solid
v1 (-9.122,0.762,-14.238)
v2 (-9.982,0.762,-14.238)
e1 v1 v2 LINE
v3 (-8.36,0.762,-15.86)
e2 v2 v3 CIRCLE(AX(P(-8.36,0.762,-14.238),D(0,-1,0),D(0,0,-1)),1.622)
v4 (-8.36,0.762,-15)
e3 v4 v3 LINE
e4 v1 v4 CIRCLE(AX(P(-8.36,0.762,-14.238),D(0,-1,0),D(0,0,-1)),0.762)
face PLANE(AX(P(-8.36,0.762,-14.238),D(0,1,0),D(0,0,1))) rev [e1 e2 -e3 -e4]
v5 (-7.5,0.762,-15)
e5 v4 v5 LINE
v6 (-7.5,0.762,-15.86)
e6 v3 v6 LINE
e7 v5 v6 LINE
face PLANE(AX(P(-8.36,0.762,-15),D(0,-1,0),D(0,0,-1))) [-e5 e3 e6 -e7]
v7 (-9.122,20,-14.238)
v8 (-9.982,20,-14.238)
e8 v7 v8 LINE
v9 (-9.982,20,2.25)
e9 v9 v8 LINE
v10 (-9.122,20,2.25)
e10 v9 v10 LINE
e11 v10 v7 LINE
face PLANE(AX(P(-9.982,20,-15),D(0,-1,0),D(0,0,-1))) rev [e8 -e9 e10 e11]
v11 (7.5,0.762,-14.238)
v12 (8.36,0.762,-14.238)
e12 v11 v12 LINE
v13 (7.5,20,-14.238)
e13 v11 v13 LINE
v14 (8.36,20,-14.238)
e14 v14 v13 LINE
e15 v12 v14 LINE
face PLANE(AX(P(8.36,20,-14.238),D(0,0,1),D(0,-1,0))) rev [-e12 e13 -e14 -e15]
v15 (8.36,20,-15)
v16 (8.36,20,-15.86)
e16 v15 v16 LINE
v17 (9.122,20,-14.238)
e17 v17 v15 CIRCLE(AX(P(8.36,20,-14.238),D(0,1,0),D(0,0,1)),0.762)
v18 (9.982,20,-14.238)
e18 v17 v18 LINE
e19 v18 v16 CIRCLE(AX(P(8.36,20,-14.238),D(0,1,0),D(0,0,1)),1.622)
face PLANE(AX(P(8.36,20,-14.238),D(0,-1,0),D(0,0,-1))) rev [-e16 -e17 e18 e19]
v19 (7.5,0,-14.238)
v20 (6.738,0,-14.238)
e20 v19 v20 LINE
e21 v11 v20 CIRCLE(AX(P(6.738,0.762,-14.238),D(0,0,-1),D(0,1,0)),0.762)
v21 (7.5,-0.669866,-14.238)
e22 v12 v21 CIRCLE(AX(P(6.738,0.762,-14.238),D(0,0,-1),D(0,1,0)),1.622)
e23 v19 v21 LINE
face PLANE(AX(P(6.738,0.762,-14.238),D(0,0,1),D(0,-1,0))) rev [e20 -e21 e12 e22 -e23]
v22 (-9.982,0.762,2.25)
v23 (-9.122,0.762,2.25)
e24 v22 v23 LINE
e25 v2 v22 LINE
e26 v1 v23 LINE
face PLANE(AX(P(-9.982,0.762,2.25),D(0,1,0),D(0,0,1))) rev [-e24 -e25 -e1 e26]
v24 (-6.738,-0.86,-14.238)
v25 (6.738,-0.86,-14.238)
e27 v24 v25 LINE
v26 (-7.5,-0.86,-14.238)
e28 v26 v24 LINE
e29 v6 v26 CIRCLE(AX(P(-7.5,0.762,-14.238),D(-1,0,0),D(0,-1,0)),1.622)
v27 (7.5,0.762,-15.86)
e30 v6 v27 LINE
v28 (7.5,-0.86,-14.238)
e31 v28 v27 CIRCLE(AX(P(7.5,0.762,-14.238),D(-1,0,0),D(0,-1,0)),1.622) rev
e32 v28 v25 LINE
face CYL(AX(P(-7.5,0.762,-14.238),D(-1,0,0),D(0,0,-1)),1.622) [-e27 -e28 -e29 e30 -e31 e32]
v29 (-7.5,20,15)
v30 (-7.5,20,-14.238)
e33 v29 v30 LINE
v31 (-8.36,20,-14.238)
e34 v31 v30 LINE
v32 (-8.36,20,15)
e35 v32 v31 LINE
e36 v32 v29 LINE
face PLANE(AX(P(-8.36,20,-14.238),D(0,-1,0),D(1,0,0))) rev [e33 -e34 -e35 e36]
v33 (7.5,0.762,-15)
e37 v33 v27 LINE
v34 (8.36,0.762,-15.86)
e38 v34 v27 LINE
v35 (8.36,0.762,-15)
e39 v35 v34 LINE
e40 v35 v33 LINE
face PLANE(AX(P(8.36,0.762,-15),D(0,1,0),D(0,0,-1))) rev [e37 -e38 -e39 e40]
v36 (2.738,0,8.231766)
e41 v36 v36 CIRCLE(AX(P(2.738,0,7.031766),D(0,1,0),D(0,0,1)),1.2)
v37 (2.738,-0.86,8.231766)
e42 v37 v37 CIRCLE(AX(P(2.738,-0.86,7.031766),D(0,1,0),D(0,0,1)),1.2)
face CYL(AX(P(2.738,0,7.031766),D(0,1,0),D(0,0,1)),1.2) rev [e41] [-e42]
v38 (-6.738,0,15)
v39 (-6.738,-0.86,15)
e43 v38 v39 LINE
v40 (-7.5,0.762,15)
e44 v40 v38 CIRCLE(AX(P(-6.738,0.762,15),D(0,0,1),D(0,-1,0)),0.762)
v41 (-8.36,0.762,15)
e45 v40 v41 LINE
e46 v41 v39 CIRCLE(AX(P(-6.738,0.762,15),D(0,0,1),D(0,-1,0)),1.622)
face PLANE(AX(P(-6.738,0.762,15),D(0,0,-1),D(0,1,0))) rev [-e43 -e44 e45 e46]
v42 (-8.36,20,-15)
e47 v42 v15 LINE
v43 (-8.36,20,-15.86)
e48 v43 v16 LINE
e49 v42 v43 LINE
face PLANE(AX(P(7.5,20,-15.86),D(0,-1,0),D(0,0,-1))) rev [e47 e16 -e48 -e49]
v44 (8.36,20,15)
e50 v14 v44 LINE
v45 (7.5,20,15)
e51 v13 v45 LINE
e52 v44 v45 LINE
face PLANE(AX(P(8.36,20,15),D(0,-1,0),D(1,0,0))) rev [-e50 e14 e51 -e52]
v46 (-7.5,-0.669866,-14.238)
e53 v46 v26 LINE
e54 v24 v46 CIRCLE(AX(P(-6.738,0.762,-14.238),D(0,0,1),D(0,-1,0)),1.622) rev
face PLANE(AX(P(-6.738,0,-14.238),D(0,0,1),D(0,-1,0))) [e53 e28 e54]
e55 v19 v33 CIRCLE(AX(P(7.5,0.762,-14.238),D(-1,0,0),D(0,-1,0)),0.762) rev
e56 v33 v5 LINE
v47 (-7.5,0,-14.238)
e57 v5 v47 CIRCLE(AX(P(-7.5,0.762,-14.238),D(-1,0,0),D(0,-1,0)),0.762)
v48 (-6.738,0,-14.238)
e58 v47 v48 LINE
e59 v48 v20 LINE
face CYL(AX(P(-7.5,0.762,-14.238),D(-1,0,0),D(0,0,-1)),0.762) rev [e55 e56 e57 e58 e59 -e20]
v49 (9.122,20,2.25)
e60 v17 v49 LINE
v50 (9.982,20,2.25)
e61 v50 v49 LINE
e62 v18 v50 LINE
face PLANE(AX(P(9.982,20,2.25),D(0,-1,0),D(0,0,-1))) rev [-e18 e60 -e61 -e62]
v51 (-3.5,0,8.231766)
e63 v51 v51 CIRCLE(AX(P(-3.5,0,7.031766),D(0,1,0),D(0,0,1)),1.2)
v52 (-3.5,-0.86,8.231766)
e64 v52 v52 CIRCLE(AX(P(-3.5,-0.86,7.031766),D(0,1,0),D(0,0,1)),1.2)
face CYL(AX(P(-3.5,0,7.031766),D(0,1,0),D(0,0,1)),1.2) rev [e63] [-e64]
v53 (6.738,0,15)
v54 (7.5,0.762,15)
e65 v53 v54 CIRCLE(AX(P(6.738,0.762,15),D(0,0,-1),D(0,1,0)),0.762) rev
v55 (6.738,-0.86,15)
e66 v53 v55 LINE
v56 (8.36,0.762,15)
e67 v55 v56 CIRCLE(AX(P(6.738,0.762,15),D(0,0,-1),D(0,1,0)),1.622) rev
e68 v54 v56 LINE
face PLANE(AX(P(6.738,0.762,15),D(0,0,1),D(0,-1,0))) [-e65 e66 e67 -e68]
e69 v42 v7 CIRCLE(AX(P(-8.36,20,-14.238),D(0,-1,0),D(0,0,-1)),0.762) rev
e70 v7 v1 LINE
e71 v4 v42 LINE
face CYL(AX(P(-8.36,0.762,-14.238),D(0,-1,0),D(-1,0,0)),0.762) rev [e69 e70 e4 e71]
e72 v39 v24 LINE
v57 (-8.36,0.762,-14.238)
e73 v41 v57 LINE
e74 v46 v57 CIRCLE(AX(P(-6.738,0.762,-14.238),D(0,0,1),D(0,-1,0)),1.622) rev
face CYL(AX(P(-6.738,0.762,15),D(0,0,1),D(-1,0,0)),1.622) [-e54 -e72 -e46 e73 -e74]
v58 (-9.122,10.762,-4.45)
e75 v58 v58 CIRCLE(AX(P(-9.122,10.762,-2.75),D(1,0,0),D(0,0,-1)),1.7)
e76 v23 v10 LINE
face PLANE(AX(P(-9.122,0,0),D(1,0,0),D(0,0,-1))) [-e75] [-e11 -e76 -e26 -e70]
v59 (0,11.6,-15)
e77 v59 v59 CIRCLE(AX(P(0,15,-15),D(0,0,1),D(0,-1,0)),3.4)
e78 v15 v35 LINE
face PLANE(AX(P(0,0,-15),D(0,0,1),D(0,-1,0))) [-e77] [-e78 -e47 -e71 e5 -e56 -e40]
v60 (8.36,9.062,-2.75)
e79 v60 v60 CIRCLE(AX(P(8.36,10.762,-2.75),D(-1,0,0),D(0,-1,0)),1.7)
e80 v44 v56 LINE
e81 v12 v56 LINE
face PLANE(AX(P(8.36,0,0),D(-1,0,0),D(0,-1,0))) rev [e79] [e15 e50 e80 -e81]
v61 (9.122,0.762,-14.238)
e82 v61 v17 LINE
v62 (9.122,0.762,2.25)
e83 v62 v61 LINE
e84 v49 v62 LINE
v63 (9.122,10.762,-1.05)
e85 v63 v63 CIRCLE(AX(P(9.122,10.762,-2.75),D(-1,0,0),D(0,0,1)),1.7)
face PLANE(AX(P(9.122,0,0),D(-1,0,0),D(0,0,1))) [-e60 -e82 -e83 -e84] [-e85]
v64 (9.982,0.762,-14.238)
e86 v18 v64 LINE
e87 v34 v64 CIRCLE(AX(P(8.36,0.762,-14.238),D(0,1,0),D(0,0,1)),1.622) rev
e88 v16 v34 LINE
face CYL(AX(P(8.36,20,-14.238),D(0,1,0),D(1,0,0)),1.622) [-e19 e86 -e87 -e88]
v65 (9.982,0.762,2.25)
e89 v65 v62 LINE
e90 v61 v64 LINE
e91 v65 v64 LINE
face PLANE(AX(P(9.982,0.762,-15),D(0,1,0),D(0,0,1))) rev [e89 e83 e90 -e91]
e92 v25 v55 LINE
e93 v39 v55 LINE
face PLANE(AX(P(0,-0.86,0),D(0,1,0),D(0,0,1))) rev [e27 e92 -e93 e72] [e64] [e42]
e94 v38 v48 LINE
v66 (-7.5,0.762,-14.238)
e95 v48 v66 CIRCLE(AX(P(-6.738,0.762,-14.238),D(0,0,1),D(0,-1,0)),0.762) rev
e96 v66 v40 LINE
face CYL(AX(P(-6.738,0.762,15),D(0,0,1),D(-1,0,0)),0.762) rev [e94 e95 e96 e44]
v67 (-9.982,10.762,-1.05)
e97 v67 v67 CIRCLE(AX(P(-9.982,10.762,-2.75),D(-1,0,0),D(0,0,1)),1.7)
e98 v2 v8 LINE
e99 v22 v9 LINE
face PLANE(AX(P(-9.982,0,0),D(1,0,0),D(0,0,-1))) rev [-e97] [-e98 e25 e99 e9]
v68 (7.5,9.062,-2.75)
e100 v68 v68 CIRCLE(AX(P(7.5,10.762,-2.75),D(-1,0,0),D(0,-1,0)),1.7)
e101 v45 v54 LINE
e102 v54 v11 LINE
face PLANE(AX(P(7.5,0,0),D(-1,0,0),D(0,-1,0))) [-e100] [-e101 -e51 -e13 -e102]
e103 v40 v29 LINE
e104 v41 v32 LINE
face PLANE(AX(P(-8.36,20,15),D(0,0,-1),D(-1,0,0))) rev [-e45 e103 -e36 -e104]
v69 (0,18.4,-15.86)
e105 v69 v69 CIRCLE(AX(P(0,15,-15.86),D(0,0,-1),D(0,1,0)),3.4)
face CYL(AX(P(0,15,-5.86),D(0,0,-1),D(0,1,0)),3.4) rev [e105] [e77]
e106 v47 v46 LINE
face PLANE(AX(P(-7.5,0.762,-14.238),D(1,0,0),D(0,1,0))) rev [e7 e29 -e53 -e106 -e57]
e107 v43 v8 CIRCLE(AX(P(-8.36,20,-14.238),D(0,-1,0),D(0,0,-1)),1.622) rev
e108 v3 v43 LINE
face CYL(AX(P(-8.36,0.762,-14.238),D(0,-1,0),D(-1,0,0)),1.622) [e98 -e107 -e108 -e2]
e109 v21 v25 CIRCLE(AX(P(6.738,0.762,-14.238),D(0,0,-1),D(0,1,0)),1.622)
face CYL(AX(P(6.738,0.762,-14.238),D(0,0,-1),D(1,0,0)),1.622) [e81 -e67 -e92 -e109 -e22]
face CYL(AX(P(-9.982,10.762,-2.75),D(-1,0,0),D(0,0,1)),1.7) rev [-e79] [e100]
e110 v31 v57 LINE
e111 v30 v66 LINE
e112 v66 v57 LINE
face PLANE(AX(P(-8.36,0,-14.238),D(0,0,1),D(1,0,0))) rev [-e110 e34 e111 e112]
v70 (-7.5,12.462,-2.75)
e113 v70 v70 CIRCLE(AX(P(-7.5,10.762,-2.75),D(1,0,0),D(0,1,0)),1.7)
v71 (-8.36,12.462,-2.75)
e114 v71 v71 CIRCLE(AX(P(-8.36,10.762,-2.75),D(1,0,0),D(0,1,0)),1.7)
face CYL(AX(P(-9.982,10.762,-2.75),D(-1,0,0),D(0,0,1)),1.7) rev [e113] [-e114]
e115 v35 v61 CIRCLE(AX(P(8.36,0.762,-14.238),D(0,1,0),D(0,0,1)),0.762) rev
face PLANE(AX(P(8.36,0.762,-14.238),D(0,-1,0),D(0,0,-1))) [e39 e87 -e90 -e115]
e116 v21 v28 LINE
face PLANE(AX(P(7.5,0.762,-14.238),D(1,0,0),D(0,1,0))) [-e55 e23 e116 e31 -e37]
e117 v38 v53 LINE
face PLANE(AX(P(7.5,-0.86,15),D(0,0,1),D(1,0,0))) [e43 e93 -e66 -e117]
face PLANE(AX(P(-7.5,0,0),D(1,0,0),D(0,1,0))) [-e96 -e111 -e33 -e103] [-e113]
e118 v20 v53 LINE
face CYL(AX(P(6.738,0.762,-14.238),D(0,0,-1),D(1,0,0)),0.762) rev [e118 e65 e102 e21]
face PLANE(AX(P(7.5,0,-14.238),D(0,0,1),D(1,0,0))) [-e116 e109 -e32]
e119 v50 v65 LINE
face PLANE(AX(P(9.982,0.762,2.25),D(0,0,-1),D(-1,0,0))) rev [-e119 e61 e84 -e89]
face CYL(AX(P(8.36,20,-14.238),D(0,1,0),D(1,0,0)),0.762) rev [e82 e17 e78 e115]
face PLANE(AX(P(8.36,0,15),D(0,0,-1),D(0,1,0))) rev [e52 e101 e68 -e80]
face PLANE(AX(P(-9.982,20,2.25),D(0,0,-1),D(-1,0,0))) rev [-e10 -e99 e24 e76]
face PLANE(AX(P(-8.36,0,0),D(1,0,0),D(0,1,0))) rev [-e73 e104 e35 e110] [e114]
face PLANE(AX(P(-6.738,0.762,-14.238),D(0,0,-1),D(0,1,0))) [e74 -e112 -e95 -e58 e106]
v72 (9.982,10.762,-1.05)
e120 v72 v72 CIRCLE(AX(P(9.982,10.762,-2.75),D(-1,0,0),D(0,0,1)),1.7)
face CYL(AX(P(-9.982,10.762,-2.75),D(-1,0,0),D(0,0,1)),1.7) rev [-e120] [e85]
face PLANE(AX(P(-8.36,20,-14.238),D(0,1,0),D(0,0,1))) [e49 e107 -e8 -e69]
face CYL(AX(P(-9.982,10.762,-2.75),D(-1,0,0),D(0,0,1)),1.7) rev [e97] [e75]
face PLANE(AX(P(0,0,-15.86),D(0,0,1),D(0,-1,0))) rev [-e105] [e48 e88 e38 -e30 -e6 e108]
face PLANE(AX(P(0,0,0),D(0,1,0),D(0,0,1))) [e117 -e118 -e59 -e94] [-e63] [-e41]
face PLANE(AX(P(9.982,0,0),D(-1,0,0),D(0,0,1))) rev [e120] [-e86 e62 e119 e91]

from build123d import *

# Parameters (mm, degrees)
SKETCH1_W                    = 15
SKETCH1_H                    = 30
BASE_FLANGE1_DEPTH           = 0.86
EDGE_FLANGE1_STRIP_W         = 4.964
EDGE_FLANGE1_STRIP_H         = 0.86
EDGE_FLANGE1_STRIP_CUT_DEPTH = 15
EDGE_FLANGE1_DEPTH           = 15
EDGE_FLANGE2_STRIP_W         = 4.964
EDGE_FLANGE2_STRIP_H         = 0.86
EDGE_FLANGE2_STRIP_CUT_DEPTH = 29.238
EDGE_FLANGE2_DEPTH           = 29.238
EDGE_FLANGE3_STRIP_W         = 4.964
EDGE_FLANGE3_STRIP_H         = 0.86
EDGE_FLANGE3_STRIP_CUT_DEPTH = 29.238
EDGE_FLANGE3_DEPTH           = 29.238
EDGE_FLANGE4_START           = 0.762
EDGE_FLANGE4_DEPTH           = 19.238
EDGE_FLANGE5_START           = 0.762
EDGE_FLANGE5_DEPTH           = 19.238
SKETCH21_R                   = 3.4
CUT_EXTRUDE1_DEPTH           = 10
M3_CLEARANCE_HOLE2_D         = 3.4
M2_CLEARANCE_HOLE1_D         = 2.4
M2_CLEARANCE_HOLE1_DEPTH     = 12
M2_CLEARANCE_HOLE1_TIP       = 0.721032743


# Read off the part's stored shape, not the designer's step: Edge-Flange4, Edge-Flange5
# Sheet-metal steps are written as plain solids
with BuildPart() as part:
    # Sketch1 → Base-Flange1 (new body)
    with BuildSketch(Plane(origin=(0, 0, 0), x_dir=(1, 0, 0), z_dir=(0, 1, 0))):
        Rectangle(SKETCH1_W, SKETCH1_H)
    extrude(amount=-BASE_FLANGE1_DEPTH)

    # Edge-Flange1 strip (across the edge) → Edge-Flange1 strip cut (cut)
    with BuildSketch(Plane(origin=(7.5, 0, -15), x_dir=(0, 0, 1), z_dir=(-1, 0, 0))):
        with Locations((-1.72, -0.43)):
            Rectangle(EDGE_FLANGE1_STRIP_W, EDGE_FLANGE1_STRIP_H)
    extrude(amount=EDGE_FLANGE1_STRIP_CUT_DEPTH, mode=Mode.SUBTRACT)

    # Edge-Flange1 section (across the edge) → Edge-Flange1 (add)
    with BuildSketch(Plane(origin=(7.5, 0, -15), x_dir=(0, 0, 1), z_dir=(-1, 0, 0))):
        with BuildLine():
            Line((-0.86, 0.762), (-0.86, 20))
            Line((-0.86, 20), (0, 20))
            Line((0, 20), (0, 0.762))
            ThreePointArc((0, 0.762), (0.223184633, 0.223184633), (0.762, 0))
            Line((0.762, 0), (0.762, -0.86))
            ThreePointArc((0.762, -0.86), (-0.384927199, -0.384927199), (-0.86, 0.762))
        make_face()
    extrude(amount=EDGE_FLANGE1_DEPTH)

    # Edge-Flange2 strip (across the edge) → Edge-Flange2 strip cut (cut)
    with BuildSketch(Plane(origin=(7.5, 0, 15), x_dir=(-1, 0, 0), z_dir=(0, 0, -1))):
        with Locations((-1.72, -0.43)):
            Rectangle(EDGE_FLANGE2_STRIP_W, EDGE_FLANGE2_STRIP_H)
    extrude(amount=EDGE_FLANGE2_STRIP_CUT_DEPTH, mode=Mode.SUBTRACT)

    # Edge-Flange2 section (across the edge) → Edge-Flange2 (add)
    with BuildSketch(Plane(origin=(7.5, 0, 15), x_dir=(-1, 0, 0), z_dir=(0, 0, -1))):
        with BuildLine():
            Line((-0.86, 0.762), (-0.86, 20))
            Line((-0.86, 20), (0, 20))
            Line((0, 20), (0, 0.762))
            ThreePointArc((0, 0.762), (0.223184633, 0.223184633), (0.762, 0))
            Line((0.762, 0), (0.762, -0.86))
            ThreePointArc((0.762, -0.86), (-0.384927199, -0.384927199), (-0.86, 0.762))
        make_face()
    extrude(amount=EDGE_FLANGE2_DEPTH)

    # Edge-Flange3 strip (across the edge) → Edge-Flange3 strip cut (cut)
    with BuildSketch(Plane(origin=(-7.5, 0, -14.238), x_dir=(1, 0, 0), z_dir=(0, 0, 1))):
        with Locations((-1.72, -0.43)):
            Rectangle(EDGE_FLANGE3_STRIP_W, EDGE_FLANGE3_STRIP_H)
    extrude(amount=EDGE_FLANGE3_STRIP_CUT_DEPTH, mode=Mode.SUBTRACT)

    # Edge-Flange3 section (across the edge) → Edge-Flange3 (add)
    with BuildSketch(Plane(origin=(-7.5, 0, -14.238), x_dir=(1, 0, 0), z_dir=(0, 0, 1))):
        with BuildLine():
            Line((-0.86, 0.762), (-0.86, 20))
            Line((-0.86, 20), (0, 20))
            Line((0, 20), (0, 0.762))
            ThreePointArc((0, 0.762), (0.223184633, 0.223184633), (0.762, 0))
            Line((0.762, 0), (0.762, -0.86))
            ThreePointArc((0.762, -0.86), (-0.384927199, -0.384927199), (-0.86, 0.762))
        make_face()
    extrude(amount=EDGE_FLANGE3_DEPTH)

    # Edge-Flange4 outline → Edge-Flange4 (add)
    with BuildSketch(Plane(origin=(0, 0, 0), x_dir=(1, 0, 0), z_dir=(0, 1, 0)).offset(EDGE_FLANGE4_START)):
        with BuildLine():
            ThreePointArc((-8.36, 15.86), (-9.506927199, 15.384927199), (-9.982, 14.238))
            Line((-9.982, 14.238), (-9.982, -2.25))
            Line((-9.982, -2.25), (-9.122, -2.25))
            Line((-9.122, -2.25), (-9.122, 14.238))
            ThreePointArc((-9.122, 14.238), (-8.898815367, 14.776815367), (-8.36, 15))
            Line((-8.36, 15), (-7.5, 15))
            Line((-7.5, 15), (-7.5, 15.86))
            Line((-7.5, 15.86), (-8.36, 15.86))
        make_face()
    extrude(amount=EDGE_FLANGE4_DEPTH)

    # Edge-Flange5 outline → Edge-Flange5 (add)
    with BuildSketch(Plane(origin=(0, 0, 0), x_dir=(1, 0, 0), z_dir=(0, 1, 0)).offset(EDGE_FLANGE5_START)):
        with BuildLine():
            Line((9.122, -2.25), (9.982, -2.25))
            Line((9.982, -2.25), (9.982, 14.238))
            ThreePointArc((9.982, 14.238), (9.506927199, 15.384927199), (8.36, 15.86))
            Line((8.36, 15.86), (7.5, 15.86))
            Line((7.5, 15.86), (7.5, 15))
            Line((7.5, 15), (8.36, 15))
            ThreePointArc((8.36, 15), (8.898815367, 14.776815367), (9.122, 14.238))
            Line((9.122, 14.238), (9.122, -2.25))
        make_face()
    extrude(amount=EDGE_FLANGE5_DEPTH)

    # Sketch21 → Cut-Extrude1 (cut)
    with BuildSketch(Plane(origin=(0, 0, -15.86), x_dir=(-1, 0, 0), z_dir=(0, 0, -1))):
        with Locations(Location((0, 15, 0), (0, 0, 90))):
            Circle(SKETCH21_R)
    extrude(amount=-CUT_EXTRUDE1_DEPTH, mode=Mode.SUBTRACT)

    # M3 Clearance Hole2 (through all)
    with Locations(Plane.ZY.offset(9.982)):
        with Locations((-2.75, 10.762)):
            Hole(M3_CLEARANCE_HOLE2_D / 2)

    # M2 Clearance Hole1
    with Locations(Plane(origin=(0, 0, 0), x_dir=(1, 0, 0), z_dir=(0, 1, 0))):
        with Locations((2.738, -7.031765706), (-3.5, -7.031765706)):
            Hole(M2_CLEARANCE_HOLE1_D / 2, depth=M2_CLEARANCE_HOLE1_DEPTH)
            with Locations((0, 0, -(M2_CLEARANCE_HOLE1_DEPTH + M2_CLEARANCE_HOLE1_TIP / 2))):  # 118° drill point
                Cone(0, M2_CLEARANCE_HOLE1_D / 2, M2_CLEARANCE_HOLE1_TIP, mode=Mode.SUBTRACT)


solid = part.part
